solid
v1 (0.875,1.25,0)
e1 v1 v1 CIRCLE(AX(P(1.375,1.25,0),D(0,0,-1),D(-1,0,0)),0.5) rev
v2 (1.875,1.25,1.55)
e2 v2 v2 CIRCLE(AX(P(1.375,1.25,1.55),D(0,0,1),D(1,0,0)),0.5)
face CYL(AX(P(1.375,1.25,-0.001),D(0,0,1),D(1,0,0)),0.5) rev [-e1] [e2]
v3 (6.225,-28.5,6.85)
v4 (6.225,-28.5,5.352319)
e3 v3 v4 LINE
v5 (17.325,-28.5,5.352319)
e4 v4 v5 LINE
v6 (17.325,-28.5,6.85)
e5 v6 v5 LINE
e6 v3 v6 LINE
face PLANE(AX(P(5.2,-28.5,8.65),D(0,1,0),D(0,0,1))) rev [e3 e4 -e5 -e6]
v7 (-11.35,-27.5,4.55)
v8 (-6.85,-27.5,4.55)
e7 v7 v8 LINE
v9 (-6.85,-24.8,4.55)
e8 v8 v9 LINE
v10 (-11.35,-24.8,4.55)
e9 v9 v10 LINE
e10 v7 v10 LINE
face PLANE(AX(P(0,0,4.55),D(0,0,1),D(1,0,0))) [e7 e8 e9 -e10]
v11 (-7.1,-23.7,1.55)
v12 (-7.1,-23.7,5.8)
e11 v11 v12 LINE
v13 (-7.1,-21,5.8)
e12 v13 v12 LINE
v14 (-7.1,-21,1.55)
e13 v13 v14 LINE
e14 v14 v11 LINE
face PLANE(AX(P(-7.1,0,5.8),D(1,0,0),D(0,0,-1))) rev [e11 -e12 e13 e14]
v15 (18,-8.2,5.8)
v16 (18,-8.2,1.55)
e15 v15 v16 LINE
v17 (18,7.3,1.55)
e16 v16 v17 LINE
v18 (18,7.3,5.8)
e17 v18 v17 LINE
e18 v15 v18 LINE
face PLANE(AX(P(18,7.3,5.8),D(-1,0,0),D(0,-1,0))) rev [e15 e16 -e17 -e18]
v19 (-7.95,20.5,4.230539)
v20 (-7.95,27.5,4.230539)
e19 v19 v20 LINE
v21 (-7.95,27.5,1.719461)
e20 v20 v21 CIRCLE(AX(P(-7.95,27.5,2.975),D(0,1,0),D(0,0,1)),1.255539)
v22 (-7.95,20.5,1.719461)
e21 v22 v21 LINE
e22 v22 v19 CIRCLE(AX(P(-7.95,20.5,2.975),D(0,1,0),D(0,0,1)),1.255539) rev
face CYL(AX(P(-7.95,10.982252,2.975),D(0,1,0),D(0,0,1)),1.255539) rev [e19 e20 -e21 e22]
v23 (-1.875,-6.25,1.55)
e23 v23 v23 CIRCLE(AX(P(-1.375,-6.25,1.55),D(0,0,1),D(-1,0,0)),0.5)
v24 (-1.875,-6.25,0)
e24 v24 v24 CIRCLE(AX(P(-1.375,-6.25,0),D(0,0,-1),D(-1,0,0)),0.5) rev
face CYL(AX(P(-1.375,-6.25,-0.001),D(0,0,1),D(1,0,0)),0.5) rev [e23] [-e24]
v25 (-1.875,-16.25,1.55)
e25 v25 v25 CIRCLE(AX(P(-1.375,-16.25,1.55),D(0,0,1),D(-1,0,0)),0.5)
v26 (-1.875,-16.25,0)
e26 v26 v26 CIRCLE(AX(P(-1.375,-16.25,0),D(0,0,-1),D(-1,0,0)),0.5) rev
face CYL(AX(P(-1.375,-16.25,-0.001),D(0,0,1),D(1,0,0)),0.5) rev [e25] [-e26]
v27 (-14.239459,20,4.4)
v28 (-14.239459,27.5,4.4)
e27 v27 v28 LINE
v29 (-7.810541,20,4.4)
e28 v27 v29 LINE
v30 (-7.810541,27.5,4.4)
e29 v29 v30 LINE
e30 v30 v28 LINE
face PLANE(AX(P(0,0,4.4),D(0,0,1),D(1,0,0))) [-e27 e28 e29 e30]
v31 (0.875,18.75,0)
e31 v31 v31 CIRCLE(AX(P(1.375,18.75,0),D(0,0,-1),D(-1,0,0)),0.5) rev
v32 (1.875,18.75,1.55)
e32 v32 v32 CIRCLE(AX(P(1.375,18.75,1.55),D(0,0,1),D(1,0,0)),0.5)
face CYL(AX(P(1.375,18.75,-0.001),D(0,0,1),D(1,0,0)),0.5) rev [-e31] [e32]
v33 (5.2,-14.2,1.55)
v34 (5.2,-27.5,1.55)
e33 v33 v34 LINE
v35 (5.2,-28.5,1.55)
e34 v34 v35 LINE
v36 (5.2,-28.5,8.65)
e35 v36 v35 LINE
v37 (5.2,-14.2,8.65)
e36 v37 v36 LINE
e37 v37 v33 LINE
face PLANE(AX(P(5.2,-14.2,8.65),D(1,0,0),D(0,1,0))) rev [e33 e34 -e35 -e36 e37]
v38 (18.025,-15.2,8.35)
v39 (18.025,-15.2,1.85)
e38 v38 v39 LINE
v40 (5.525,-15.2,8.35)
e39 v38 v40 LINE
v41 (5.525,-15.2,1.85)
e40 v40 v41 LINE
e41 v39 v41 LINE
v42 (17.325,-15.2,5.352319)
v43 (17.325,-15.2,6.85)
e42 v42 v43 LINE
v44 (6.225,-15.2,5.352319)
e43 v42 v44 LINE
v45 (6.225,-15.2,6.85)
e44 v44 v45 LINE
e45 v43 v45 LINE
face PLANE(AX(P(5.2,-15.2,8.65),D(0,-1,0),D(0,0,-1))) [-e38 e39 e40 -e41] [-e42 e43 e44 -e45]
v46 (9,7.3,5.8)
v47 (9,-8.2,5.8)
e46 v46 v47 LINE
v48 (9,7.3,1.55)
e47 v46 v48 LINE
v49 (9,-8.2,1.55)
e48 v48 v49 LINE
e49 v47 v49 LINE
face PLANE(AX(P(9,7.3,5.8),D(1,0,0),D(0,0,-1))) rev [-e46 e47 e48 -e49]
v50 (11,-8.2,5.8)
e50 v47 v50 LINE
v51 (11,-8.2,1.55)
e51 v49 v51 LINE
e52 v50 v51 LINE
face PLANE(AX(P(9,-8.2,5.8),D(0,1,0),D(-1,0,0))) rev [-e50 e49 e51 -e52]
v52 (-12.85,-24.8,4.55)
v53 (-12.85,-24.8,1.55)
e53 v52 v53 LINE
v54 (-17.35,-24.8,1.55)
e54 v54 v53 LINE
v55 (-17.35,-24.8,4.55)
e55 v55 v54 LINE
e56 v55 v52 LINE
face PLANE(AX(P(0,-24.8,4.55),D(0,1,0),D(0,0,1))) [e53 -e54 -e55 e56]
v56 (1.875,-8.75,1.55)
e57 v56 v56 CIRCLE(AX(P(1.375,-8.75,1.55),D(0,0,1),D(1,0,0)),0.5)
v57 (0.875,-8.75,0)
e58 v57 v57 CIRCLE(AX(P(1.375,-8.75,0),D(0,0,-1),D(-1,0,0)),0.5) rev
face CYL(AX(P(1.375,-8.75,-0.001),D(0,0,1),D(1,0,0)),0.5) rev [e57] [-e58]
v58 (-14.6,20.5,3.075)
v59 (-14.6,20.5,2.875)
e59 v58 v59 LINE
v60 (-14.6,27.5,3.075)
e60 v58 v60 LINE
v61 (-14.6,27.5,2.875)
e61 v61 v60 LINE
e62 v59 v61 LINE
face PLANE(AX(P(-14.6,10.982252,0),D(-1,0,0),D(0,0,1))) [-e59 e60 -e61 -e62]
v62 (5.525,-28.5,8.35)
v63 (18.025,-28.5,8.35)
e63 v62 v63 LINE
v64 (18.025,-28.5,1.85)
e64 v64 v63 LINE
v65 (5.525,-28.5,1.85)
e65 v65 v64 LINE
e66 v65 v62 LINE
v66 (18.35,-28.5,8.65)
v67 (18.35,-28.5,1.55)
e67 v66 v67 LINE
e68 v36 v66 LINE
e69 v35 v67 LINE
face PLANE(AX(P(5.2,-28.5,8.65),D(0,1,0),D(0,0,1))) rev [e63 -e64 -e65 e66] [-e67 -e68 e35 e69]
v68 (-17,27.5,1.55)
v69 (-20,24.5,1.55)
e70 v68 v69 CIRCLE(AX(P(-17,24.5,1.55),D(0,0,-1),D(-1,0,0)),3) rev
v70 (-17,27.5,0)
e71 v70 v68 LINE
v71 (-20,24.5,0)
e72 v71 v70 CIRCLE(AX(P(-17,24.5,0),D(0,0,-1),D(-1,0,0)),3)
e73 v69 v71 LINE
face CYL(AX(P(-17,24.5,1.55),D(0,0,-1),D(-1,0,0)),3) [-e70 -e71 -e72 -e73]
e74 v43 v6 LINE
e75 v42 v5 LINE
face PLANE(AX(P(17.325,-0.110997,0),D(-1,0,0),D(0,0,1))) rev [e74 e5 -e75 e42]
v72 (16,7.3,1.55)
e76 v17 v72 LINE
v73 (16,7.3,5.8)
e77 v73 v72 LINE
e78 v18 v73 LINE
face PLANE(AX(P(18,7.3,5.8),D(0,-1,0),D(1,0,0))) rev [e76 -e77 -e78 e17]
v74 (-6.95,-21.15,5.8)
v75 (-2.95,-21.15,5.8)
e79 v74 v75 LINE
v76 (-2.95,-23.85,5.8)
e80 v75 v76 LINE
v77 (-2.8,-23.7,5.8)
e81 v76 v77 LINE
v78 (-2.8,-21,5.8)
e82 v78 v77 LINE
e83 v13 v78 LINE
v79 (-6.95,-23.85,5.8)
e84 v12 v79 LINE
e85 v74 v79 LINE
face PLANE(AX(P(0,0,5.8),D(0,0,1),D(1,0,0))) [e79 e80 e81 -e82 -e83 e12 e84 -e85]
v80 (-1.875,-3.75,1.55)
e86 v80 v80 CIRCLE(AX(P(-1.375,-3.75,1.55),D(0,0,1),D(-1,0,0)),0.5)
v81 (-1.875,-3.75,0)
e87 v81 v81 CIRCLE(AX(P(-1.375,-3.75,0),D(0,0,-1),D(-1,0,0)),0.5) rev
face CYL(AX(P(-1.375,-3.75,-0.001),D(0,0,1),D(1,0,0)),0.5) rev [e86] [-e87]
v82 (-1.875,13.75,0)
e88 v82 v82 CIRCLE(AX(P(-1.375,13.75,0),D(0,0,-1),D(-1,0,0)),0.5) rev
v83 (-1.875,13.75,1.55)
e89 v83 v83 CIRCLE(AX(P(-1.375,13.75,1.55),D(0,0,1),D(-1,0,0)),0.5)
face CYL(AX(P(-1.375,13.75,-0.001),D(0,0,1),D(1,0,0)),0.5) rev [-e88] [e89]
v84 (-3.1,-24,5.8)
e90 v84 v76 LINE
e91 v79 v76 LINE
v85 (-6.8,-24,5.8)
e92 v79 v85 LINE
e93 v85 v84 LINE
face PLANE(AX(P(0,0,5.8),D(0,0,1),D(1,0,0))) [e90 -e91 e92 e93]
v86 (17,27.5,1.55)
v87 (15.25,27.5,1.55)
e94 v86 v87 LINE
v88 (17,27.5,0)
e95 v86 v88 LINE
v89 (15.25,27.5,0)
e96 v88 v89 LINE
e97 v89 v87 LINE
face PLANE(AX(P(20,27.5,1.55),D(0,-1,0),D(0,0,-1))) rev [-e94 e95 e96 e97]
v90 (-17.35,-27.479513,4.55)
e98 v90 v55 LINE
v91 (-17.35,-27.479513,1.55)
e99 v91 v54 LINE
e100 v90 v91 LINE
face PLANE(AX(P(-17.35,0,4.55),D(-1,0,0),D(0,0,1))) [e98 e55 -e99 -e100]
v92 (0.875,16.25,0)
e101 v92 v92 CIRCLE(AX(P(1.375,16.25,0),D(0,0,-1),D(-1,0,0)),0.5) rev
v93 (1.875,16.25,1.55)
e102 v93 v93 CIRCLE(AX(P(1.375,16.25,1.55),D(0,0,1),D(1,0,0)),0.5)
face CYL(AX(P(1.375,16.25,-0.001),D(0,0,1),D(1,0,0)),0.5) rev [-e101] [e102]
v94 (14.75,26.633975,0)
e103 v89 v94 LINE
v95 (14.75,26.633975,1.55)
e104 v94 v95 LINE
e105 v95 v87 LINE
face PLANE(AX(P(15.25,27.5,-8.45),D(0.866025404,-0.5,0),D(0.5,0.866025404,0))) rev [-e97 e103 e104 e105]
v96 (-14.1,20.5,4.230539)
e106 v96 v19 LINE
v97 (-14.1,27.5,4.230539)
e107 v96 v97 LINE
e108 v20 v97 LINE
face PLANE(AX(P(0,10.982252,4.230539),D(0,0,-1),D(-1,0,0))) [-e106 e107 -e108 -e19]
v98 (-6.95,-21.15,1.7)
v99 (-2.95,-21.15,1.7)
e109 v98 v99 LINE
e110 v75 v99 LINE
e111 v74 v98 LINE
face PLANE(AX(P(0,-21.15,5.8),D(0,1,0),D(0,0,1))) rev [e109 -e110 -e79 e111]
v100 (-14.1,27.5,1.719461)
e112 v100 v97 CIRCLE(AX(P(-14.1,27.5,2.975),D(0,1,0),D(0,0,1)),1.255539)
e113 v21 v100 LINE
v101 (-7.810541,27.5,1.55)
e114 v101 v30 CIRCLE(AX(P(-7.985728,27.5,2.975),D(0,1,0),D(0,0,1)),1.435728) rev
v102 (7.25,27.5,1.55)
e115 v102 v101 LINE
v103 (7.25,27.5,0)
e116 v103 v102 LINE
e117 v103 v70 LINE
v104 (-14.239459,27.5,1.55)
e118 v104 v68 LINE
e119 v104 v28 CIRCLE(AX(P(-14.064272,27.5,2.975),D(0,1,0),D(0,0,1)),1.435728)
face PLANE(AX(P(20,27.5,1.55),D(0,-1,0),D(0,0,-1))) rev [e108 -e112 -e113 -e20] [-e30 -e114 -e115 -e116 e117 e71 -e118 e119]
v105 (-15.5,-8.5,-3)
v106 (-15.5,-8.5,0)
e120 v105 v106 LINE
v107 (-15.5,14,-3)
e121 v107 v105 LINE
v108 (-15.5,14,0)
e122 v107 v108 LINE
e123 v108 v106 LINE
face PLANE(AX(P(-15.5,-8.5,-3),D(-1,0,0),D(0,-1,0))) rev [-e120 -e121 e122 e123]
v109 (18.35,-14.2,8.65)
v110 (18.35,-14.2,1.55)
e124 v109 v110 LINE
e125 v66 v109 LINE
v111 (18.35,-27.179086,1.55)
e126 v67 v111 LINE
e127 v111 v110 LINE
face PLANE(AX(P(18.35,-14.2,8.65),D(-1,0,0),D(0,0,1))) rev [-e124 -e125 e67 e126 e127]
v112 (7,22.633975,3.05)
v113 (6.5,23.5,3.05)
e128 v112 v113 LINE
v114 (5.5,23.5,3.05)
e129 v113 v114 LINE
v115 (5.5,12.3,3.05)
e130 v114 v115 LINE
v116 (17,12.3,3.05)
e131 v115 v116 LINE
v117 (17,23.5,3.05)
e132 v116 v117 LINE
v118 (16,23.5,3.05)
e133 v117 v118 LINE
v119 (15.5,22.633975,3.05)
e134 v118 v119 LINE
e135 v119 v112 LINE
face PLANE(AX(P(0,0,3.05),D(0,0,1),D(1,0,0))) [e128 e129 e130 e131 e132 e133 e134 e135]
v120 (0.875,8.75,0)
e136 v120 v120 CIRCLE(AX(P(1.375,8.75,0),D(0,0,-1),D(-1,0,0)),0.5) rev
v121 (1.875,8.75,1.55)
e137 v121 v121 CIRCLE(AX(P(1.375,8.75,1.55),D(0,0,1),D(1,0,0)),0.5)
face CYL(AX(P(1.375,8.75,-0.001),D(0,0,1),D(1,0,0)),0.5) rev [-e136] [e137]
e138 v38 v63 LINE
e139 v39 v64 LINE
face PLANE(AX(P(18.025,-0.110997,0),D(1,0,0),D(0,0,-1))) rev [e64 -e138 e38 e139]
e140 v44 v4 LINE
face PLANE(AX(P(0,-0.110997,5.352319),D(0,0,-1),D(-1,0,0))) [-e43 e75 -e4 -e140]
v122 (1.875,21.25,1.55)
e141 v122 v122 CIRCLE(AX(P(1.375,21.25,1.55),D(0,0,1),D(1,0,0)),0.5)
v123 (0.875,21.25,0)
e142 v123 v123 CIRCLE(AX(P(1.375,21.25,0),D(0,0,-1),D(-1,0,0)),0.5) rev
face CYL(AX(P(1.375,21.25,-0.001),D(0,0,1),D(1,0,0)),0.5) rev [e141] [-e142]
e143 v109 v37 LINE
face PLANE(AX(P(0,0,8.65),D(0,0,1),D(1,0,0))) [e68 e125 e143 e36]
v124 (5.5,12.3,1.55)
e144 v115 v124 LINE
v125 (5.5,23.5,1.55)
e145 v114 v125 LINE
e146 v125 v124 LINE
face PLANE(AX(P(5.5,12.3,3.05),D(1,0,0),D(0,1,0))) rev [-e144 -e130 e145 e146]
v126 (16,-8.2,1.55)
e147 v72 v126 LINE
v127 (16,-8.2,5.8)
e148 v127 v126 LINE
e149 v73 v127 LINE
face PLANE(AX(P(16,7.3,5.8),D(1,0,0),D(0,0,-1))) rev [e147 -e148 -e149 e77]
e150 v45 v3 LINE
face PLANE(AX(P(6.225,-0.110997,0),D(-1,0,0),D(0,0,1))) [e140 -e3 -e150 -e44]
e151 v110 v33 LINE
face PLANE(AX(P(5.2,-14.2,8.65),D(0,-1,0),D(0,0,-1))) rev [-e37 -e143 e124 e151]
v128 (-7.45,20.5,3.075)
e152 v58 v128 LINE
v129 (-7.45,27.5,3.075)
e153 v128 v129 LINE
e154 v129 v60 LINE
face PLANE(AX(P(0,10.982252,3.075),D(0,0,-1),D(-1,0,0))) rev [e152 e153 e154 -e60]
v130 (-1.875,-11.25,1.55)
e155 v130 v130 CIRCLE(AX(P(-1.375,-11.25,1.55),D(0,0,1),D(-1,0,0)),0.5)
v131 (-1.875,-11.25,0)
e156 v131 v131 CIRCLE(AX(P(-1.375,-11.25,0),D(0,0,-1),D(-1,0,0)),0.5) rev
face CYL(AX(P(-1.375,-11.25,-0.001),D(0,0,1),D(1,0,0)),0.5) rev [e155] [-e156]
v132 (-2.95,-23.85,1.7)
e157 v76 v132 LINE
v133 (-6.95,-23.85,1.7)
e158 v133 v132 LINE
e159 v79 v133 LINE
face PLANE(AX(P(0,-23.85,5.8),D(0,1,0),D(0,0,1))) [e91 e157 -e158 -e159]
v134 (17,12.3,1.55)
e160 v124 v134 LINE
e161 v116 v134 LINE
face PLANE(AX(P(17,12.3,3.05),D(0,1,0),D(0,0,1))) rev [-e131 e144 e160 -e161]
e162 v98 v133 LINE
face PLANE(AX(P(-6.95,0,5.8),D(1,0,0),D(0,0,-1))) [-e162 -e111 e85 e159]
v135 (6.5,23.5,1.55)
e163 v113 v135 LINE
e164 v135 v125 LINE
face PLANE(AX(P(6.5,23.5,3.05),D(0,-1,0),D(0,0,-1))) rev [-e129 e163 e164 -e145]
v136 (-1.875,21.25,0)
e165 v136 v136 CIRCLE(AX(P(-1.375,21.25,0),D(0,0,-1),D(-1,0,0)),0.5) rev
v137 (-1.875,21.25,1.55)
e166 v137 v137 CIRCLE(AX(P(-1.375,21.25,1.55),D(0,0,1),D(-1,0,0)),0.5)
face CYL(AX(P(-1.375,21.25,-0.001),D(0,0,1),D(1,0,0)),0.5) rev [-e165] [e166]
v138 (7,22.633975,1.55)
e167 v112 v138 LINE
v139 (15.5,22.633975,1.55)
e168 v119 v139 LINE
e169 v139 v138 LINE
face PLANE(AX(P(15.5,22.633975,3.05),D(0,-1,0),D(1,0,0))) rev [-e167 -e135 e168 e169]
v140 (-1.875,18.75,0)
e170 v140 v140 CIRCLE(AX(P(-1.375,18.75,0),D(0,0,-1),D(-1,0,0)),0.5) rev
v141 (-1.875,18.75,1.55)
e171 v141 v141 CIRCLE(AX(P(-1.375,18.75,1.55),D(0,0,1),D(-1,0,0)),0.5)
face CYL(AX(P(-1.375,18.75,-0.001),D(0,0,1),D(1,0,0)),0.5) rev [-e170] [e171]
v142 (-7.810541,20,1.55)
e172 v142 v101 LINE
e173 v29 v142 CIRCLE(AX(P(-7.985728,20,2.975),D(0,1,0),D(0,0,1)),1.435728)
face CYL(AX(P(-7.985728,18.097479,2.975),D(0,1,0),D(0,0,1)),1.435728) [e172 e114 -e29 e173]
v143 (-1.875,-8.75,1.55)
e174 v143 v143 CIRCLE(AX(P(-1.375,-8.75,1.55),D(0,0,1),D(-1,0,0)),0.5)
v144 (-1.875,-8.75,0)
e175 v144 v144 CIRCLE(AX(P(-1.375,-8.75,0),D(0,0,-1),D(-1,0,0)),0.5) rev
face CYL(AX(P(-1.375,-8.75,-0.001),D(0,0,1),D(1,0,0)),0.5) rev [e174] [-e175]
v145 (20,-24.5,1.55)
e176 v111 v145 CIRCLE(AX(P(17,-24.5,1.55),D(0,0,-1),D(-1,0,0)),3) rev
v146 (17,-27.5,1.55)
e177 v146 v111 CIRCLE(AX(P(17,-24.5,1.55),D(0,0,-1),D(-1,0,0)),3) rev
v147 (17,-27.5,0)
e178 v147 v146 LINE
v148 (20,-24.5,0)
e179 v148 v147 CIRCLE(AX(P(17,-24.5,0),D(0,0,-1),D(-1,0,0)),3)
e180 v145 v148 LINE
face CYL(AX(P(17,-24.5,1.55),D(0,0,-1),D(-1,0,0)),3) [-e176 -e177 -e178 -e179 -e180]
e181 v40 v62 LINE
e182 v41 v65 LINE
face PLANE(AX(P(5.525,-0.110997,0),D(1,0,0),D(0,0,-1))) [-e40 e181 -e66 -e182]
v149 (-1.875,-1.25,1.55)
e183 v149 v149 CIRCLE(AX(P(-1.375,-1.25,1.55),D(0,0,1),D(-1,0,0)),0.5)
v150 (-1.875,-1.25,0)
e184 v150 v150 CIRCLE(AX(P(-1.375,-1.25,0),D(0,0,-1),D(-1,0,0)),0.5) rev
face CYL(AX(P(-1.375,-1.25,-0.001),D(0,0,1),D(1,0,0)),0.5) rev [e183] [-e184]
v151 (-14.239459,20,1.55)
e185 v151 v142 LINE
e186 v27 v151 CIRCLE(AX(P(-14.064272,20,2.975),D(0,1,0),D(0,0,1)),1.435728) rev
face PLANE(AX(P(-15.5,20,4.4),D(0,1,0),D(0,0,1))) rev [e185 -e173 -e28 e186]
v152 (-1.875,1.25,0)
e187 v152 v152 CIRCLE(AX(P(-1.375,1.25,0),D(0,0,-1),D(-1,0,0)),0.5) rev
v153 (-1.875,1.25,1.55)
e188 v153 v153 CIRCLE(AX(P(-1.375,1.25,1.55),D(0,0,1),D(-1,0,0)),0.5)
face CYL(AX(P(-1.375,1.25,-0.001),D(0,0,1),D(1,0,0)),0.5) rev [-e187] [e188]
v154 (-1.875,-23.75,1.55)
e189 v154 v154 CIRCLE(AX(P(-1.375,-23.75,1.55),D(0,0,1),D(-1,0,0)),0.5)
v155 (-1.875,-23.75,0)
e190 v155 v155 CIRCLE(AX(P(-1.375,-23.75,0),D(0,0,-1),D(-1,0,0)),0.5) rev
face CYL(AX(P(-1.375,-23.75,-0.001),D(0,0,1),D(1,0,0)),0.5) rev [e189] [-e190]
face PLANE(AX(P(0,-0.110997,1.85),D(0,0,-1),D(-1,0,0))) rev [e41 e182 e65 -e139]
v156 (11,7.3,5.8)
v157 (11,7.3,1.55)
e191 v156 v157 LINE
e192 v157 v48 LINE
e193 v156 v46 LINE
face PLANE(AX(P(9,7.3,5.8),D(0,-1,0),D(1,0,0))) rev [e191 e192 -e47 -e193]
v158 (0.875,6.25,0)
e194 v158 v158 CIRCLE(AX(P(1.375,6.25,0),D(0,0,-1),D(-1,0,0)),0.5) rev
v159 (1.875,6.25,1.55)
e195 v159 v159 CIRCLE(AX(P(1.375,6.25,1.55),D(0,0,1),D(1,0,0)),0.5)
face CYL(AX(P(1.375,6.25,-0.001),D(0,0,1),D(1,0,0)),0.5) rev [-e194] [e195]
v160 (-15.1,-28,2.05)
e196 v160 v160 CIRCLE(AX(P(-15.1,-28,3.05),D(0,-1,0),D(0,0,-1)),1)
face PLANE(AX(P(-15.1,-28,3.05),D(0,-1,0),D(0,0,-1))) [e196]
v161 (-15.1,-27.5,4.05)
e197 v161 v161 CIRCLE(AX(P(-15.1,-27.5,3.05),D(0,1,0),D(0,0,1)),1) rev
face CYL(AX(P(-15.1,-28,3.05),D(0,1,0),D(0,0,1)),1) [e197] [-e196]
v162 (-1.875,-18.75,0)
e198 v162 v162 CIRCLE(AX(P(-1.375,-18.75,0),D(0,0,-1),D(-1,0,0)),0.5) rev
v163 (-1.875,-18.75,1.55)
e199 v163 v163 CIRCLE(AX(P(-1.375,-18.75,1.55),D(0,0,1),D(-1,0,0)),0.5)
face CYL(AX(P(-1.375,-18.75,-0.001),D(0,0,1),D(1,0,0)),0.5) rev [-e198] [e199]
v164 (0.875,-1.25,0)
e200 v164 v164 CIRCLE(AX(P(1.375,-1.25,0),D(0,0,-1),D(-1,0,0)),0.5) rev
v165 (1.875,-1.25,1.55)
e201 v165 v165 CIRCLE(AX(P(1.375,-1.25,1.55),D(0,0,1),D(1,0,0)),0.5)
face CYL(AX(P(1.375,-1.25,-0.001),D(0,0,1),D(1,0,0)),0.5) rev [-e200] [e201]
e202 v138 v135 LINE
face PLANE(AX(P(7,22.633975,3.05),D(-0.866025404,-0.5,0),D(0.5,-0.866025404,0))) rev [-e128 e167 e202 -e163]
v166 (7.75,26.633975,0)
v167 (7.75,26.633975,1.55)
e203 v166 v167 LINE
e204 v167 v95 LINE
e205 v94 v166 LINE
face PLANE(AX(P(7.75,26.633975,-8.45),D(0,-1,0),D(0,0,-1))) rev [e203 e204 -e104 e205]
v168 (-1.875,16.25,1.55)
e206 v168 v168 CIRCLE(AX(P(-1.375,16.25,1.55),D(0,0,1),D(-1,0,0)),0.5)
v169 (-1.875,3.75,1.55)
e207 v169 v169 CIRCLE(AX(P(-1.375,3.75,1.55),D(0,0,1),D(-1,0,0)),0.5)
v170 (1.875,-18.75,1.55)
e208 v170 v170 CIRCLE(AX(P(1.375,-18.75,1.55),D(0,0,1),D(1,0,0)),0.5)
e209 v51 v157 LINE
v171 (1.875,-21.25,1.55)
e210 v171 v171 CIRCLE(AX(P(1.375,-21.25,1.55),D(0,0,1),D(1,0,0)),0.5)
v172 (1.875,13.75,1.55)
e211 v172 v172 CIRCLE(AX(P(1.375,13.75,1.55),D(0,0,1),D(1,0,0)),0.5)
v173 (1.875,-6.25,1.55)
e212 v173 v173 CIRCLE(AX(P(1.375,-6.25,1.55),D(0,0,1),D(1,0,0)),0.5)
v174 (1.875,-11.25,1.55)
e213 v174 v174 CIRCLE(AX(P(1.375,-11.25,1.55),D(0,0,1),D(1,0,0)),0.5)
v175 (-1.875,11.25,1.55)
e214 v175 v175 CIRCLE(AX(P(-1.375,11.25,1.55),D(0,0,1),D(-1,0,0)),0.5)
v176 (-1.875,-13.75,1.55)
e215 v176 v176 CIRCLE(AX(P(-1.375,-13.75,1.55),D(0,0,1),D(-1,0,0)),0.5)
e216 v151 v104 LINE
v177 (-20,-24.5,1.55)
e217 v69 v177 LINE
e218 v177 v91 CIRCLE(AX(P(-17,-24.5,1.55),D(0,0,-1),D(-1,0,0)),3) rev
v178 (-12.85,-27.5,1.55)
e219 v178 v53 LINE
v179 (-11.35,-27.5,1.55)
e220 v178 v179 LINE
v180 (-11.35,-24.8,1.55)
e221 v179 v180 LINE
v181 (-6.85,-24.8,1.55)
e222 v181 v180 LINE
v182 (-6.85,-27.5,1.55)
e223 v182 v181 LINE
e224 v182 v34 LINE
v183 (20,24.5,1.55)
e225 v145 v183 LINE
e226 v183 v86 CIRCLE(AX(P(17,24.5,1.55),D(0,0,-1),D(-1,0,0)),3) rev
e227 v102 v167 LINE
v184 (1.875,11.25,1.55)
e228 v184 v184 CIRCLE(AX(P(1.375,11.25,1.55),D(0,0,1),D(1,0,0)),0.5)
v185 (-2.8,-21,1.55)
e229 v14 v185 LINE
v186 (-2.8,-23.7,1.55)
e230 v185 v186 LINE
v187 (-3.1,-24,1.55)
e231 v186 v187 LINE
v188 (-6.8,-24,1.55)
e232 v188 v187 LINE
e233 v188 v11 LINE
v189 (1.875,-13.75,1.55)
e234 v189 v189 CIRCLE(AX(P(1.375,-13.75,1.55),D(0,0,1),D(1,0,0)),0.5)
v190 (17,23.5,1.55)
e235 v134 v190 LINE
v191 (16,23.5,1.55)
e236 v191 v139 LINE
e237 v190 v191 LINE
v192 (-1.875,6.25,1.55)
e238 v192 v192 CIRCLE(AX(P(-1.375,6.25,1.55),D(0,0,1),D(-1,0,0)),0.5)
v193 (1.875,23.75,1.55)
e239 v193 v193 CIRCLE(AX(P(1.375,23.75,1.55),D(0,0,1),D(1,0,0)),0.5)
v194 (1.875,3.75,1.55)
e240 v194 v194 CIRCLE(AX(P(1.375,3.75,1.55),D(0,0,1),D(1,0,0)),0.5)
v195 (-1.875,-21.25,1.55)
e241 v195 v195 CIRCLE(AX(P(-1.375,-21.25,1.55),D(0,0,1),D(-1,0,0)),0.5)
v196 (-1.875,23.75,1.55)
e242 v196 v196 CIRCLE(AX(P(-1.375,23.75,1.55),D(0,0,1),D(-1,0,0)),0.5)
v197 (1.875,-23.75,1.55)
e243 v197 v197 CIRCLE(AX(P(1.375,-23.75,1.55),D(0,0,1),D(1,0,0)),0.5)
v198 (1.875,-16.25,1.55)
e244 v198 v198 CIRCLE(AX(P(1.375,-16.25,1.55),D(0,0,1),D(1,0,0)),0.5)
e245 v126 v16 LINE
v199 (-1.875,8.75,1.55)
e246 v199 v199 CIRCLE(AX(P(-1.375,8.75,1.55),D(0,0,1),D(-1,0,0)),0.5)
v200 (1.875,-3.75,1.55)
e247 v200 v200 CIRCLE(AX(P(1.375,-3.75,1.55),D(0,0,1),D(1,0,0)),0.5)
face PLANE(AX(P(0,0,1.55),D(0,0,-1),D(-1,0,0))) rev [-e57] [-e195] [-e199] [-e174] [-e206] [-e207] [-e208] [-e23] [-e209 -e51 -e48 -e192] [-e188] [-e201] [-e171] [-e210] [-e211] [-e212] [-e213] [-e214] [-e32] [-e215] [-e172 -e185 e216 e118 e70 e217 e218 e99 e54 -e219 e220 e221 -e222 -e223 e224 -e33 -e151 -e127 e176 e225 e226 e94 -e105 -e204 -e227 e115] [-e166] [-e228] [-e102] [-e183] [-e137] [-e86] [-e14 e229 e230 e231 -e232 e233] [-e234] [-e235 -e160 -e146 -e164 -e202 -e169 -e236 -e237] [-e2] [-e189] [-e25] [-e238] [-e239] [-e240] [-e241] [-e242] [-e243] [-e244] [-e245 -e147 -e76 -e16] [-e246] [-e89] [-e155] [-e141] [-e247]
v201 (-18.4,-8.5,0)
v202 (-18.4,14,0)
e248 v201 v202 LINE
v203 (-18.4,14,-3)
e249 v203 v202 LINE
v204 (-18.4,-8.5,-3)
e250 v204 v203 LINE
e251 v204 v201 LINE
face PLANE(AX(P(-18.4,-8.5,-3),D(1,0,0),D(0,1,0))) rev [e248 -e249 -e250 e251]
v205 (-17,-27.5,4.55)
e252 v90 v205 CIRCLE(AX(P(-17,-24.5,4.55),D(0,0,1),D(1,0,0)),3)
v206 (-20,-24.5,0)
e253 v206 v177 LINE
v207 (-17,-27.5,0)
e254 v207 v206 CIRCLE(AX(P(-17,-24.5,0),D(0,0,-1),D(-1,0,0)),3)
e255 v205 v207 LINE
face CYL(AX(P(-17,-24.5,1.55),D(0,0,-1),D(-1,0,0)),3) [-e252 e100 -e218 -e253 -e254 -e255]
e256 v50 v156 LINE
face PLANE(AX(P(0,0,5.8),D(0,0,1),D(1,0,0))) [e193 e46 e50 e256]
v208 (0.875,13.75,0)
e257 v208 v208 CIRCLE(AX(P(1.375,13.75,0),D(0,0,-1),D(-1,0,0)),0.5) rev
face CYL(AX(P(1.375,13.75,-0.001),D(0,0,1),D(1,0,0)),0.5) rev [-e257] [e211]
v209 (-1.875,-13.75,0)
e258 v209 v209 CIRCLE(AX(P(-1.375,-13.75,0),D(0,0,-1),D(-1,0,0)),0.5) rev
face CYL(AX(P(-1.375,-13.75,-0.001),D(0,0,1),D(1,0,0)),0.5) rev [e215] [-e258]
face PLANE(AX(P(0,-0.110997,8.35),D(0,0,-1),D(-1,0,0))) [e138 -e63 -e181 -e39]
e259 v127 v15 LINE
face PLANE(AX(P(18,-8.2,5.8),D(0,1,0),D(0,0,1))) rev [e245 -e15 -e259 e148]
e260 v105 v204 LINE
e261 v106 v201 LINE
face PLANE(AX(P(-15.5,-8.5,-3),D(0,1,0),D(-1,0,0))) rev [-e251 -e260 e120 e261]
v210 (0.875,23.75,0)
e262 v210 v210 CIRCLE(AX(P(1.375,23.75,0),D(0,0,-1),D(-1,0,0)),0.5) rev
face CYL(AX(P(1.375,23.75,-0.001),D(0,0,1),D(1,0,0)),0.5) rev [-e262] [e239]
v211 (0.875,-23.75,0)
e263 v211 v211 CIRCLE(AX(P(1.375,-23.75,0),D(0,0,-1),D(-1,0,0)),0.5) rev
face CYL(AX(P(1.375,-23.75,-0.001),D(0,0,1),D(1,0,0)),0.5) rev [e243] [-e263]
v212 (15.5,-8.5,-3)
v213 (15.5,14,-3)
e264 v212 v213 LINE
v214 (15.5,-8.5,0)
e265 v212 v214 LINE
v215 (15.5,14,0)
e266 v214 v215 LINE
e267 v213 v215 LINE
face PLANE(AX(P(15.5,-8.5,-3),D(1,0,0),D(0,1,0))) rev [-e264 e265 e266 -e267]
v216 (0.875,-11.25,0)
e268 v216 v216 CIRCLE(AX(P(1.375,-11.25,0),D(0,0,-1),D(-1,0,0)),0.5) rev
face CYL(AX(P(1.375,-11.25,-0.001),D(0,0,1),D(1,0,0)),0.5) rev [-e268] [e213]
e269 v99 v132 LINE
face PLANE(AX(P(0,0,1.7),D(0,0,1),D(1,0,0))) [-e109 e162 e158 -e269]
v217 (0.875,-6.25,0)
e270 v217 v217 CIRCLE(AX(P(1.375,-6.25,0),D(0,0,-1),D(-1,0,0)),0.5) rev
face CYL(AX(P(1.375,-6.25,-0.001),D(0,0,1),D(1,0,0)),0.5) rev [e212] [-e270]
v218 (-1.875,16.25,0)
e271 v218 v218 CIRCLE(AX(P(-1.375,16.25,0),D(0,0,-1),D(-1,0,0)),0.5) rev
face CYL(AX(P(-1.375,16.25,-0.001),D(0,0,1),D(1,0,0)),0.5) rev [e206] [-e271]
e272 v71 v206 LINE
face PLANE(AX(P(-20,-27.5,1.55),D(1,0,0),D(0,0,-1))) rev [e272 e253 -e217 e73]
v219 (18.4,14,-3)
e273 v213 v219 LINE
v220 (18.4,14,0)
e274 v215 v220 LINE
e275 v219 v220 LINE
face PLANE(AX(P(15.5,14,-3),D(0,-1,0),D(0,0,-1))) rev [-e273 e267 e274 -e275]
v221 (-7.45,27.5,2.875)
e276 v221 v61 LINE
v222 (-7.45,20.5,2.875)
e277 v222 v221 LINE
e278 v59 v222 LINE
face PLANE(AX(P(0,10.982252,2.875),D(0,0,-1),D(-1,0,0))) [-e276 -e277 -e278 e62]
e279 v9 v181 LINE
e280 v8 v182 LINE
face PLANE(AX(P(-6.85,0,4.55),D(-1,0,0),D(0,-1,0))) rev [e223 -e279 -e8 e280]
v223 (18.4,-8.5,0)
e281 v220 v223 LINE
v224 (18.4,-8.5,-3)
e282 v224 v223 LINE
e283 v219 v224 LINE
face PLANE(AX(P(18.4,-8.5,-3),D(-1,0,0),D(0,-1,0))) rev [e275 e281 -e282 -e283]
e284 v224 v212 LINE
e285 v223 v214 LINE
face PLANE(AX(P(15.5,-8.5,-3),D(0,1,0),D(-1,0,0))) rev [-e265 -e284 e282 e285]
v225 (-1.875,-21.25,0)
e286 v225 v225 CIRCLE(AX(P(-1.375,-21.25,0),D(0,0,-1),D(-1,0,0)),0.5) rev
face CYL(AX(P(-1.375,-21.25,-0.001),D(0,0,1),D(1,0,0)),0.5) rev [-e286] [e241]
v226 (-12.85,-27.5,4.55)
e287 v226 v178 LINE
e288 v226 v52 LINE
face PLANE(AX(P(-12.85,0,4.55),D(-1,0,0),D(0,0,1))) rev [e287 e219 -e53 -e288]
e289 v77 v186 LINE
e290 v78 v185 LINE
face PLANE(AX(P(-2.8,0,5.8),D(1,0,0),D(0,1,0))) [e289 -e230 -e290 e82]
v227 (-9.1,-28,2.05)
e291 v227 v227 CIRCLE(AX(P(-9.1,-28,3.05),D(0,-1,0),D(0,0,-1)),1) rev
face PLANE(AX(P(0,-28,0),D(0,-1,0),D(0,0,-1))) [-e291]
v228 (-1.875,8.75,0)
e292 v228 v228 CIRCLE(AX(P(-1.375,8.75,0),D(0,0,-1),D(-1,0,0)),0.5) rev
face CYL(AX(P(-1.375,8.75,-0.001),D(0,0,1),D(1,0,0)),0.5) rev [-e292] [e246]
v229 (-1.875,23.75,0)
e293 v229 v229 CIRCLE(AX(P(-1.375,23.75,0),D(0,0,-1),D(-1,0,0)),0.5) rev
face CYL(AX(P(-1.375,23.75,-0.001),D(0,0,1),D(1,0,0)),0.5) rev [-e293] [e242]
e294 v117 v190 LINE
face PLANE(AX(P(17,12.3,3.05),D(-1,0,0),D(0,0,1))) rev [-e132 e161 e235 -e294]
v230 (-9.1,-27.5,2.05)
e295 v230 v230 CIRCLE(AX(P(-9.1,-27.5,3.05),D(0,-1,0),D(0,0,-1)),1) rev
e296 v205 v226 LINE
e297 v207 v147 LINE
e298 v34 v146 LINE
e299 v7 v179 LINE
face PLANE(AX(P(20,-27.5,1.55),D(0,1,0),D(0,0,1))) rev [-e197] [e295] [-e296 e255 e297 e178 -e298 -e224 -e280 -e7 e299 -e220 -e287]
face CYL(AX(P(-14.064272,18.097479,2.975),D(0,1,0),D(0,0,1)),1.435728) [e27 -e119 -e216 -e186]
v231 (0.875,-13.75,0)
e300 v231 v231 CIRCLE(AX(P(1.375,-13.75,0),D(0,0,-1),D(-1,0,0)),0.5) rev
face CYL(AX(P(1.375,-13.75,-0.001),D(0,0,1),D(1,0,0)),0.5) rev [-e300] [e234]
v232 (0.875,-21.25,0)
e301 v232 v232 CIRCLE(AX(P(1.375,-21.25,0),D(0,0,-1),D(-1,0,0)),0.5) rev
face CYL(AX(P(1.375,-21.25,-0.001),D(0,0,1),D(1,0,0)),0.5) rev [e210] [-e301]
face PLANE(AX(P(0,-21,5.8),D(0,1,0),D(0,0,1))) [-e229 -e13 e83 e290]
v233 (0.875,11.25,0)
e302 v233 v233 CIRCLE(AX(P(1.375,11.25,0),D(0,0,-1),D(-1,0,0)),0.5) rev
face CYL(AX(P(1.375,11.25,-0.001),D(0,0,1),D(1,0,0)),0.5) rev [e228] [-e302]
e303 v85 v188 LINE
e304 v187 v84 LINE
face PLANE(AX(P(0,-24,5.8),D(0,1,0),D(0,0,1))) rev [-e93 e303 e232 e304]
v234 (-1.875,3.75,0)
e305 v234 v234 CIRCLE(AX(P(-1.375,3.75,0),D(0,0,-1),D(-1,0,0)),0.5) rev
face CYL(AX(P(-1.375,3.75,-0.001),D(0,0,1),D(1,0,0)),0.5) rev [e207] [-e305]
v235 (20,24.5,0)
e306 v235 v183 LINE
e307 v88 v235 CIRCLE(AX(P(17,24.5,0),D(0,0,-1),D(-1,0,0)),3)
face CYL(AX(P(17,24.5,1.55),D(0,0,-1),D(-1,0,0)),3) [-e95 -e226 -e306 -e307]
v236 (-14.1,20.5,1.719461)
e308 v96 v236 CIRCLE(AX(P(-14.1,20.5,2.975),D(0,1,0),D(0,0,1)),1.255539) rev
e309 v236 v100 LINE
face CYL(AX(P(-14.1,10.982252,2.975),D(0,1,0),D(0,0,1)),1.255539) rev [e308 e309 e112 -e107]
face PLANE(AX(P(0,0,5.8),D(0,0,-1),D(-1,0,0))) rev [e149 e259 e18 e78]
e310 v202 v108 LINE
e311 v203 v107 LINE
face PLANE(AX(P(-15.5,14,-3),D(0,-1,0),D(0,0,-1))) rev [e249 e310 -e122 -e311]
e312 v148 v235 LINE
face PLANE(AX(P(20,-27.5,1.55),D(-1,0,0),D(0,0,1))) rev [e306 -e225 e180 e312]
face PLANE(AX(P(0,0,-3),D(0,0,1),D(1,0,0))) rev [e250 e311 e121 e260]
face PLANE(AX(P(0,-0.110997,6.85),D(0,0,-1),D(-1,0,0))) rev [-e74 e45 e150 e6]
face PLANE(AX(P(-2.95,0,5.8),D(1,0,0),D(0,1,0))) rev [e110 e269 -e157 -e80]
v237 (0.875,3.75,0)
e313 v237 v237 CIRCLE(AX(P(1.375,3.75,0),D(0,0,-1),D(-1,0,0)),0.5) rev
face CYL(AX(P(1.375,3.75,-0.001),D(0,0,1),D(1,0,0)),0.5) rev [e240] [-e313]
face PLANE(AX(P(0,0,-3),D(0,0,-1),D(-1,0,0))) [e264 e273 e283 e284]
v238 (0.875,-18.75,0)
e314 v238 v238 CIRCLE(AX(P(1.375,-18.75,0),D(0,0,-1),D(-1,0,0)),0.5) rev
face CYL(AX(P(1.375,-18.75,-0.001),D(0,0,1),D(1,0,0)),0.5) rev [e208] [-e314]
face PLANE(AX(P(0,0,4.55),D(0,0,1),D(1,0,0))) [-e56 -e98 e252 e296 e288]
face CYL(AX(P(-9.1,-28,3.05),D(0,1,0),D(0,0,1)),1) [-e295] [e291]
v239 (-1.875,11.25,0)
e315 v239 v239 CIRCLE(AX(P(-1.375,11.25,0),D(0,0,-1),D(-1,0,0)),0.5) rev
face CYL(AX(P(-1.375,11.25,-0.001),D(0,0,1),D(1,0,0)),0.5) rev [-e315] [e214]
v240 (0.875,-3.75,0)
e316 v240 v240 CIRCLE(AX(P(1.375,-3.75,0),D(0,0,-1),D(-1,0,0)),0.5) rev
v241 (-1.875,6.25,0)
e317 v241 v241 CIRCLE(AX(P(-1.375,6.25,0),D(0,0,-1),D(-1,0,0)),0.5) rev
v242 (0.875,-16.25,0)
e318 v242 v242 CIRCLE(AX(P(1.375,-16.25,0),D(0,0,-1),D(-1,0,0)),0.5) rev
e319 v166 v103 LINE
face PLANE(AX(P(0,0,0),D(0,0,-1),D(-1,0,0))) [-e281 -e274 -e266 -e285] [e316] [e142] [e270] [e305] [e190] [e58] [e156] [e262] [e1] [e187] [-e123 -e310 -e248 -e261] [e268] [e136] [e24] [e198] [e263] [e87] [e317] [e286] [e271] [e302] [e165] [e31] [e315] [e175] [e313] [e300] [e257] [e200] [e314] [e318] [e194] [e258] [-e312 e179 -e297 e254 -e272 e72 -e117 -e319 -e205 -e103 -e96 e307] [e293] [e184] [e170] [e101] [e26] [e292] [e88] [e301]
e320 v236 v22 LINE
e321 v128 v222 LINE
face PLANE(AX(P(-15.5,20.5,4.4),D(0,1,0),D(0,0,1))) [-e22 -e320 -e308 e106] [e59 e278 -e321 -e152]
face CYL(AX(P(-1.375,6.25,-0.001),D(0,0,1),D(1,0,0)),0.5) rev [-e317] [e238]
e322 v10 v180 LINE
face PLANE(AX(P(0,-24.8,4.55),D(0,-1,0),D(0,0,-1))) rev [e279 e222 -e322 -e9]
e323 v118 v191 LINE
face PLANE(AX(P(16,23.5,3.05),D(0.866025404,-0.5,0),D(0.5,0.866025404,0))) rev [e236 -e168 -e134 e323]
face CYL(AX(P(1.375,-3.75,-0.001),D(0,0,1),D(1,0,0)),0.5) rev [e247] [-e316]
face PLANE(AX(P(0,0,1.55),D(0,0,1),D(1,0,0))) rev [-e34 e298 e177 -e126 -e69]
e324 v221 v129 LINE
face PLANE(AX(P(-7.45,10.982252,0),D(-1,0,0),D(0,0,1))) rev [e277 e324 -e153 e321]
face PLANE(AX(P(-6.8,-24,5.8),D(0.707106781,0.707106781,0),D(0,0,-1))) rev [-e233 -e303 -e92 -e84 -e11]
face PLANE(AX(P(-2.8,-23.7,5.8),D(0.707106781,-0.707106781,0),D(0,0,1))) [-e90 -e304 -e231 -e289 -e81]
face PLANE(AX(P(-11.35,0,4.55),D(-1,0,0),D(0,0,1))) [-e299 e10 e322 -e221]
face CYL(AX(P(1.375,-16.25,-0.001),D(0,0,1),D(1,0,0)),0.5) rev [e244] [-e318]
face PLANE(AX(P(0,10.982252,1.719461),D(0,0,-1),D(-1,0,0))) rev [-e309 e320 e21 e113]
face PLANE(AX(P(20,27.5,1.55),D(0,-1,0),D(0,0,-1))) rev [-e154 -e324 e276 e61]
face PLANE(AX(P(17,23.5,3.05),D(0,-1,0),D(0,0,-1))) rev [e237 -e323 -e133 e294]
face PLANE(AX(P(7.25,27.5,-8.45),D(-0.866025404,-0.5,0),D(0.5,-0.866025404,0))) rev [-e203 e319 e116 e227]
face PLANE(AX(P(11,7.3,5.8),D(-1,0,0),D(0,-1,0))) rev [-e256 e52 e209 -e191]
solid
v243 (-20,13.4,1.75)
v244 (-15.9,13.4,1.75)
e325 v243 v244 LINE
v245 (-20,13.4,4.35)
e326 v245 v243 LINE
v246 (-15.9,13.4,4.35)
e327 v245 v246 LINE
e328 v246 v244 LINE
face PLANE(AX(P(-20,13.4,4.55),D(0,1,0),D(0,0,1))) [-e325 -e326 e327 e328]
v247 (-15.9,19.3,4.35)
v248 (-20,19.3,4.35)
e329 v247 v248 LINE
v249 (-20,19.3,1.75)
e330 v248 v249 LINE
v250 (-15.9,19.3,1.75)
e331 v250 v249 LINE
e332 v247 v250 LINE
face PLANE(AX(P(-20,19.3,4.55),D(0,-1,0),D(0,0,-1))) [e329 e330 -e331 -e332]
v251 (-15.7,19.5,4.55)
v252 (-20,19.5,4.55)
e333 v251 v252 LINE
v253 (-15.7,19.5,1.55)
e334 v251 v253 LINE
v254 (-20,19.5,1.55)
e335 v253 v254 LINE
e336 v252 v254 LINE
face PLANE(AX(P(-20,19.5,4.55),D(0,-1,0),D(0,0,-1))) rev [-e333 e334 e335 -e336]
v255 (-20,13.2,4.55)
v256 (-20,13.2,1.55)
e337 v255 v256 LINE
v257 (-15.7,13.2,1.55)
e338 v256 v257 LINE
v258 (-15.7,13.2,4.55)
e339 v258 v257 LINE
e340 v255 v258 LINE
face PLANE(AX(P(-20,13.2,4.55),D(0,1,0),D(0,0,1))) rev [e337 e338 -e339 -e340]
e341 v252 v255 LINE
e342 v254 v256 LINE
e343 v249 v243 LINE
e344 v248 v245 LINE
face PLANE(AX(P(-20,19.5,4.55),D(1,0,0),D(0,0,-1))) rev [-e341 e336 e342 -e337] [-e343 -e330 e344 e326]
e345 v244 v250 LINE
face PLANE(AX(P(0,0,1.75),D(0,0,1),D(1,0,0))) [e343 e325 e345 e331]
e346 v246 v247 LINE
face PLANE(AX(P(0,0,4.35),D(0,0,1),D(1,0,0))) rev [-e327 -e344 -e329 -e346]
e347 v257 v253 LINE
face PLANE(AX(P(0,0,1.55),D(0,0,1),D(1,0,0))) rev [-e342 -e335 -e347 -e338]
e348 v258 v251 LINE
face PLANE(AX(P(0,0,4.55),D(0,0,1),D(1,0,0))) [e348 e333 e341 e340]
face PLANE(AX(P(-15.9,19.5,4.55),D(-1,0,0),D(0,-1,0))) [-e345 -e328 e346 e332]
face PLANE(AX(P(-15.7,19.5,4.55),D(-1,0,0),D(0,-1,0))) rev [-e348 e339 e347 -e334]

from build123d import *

# Parameters (mm, degrees)
SKETCH1_W            = 55
SKETCH1_H            = 40
BOSS_EXTRUDE1_DEPTH  = 1.55
FILLET1_R            = 3
SKETCH2_W            = 13.15
SKETCH2_H            = 14.3
BOSS_EXTRUDE2_DEPTH  = 7.1
SKETCH3_W            = 12.5
SKETCH3_H            = 6.5
SKETCH3_W_2          = 11.1
SKETCH3_H_2          = 1.497681088
CUT_EXTRUDE1_DEPTH   = 13.3
SKETCH4_W            = 8.95
SKETCH4_H            = 7.5
BOSS_EXTRUDE3_DEPTH  = 2.85
CUT_EXTRUDE2_DEPTH   = 7.5
SKETCH5_3_W          = 7.15
SKETCH5_3_H          = 0.2
CUT_EXTRUDE3_DEPTH   = 7
BOSS_EXTRUDE4_DEPTH  = 1.5
CUT_EXTRUDE4_DEPTH   = 10
BOSS_EXTRUDE5_START  = 3
SKETCH8_W            = 4.5
SKETCH8_H            = 2.7
BOSS_EXTRUDE5_DEPTH  = 3
SKETCH9_R            = 1
BOSS_EXTRUDE6_DEPTH  = 0.5
SKETCH10_W           = 2
SKETCH10_H           = 15.5
BOSS_EXTRUDE7_DEPTH  = 4.25
SKETCH8_4_W          = 4.3
SKETCH8_4_H          = 3
BOSS_EXTRUDE9_DEPTH  = 4.25
SHELL2_T             = -0.15
CHAMFER1_SIZE        = 0.3
SKETCH11_R           = 0.5
CUT_EXTRUDE5_DEPTH   = 1.55
SKETCH12_W           = 4.3
SKETCH12_H           = 6.3
BOSS_EXTRUDE10_DEPTH = 3
SHELL3_T             = -0.2
SKETCH13_W           = 2.9
SKETCH13_H           = 22.5
BOSS_EXTRUDE11_DEPTH = 3


with BuildPart() as part:
    # Sketch1 → Boss-Extrude1 (new body)
    with BuildSketch(Plane(origin=(0, 0, 0), x_dir=(0, 1, 0), z_dir=(0, 0, 1))):
        Rectangle(SKETCH1_W, SKETCH1_H)
    extrude(amount=BOSS_EXTRUDE1_DEPTH)

    # Fillet1
    fillet1_edges = [part.edges().sort_by_distance(p)[0] for p in [
        (20, 27.5, 0.775),
        (20, -27.5, 0.775),
        (-20, -27.5, 0.775),
        (-20, 27.5, 0.775),
    ]]
    fillet(fillet1_edges, radius=FILLET1_R)

    # Sketch2 → Boss-Extrude2 (add)
    with BuildSketch(Plane.XY.offset(1.55)):
        with Locations((11.775, -21.35)):
            Rectangle(SKETCH2_W, SKETCH2_H)
    extrude(amount=BOSS_EXTRUDE2_DEPTH)

    # Sketch3 → Cut-Extrude1 (cut)
    with BuildSketch(Plane.XZ.offset(28.5)):
        with Locations((11.775, 5.1)):
            Rectangle(SKETCH3_W, SKETCH3_H)
        with Locations((11.775, 6.101159456)):
            Rectangle(SKETCH3_W_2, SKETCH3_H_2, mode=Mode.SUBTRACT)
    extrude(amount=-CUT_EXTRUDE1_DEPTH, mode=Mode.SUBTRACT)

    # Sketch4 → Boss-Extrude3 (add)
    with BuildSketch(Plane.XY.offset(1.55)):
        with Locations((-11.025, 23.75)):
            Rectangle(SKETCH4_W, SKETCH4_H)
    extrude(amount=BOSS_EXTRUDE3_DEPTH)

    # Sketch5 → Cut-Extrude2 (cut)
    with BuildSketch(Plane(origin=(0, 27.5, 0), x_dir=(-1, 0, 0), z_dir=(0, 1, 0))):
        with BuildLine():
            Line((6.55, 4.4), (6.55, 2.975))
            ThreePointArc((6.55, 2.975), (6.910359128, 3.926260685), (7.810540583, 4.4))
            Line((7.810540583, 4.4), (6.55, 4.4))
        make_face()
        with BuildLine():
            Line((6.55, 1.55), (7.810540583, 1.55))
            ThreePointArc((7.810540583, 1.55), (6.910359128, 2.023739315), (6.55, 2.975))
            Line((6.55, 2.975), (6.55, 1.55))
        make_face()
        with BuildLine():
            Line((15.5, 1.55), (15.5, 2.975))
            ThreePointArc((15.5, 2.975), (15.139640872, 2.023739315), (14.239459417, 1.55))
            Line((14.239459417, 1.55), (15.5, 1.55))
        make_face()
        with BuildLine():
            Line((15.5, 4.4), (14.239459417, 4.4))
            ThreePointArc((14.239459417, 4.4), (15.139640872, 3.926260685), (15.5, 2.975))
            Line((15.5, 2.975), (15.5, 4.4))
        make_face()
    extrude(amount=-CUT_EXTRUDE2_DEPTH, mode=Mode.SUBTRACT)

    # Sketch5<3> → Cut-Extrude3 (cut)
    with BuildSketch(Plane(origin=(0, 27.5, 0), x_dir=(-1, 0, 0), z_dir=(0, 1, 0))):
        with BuildLine():
            Line((7.95, 1.719461162), (14.1, 1.719461162))
            ThreePointArc((14.1, 1.719461162), (15.355538838, 2.975), (14.1, 4.230538838))
            Line((14.1, 4.230538838), (7.95, 4.230538838))
            ThreePointArc((7.95, 4.230538838), (6.694461162, 2.975), (7.95, 1.719461162))
        make_face()
        with Locations((11.025, 2.975)):
            Rectangle(SKETCH5_3_W, SKETCH5_3_H, mode=Mode.SUBTRACT)
    extrude(amount=-CUT_EXTRUDE3_DEPTH, mode=Mode.SUBTRACT)

    # Sketch6 → Boss-Extrude4 (add)
    with BuildSketch(Plane.XY.offset(1.55)):
        Polygon((16, 23.5), (15.5, 22.633974596), (7, 22.633974596), (6.5, 23.5), (5.5, 23.5), (5.5, 12.3), (17, 12.3), (17, 23.5), align=None)
    extrude(amount=BOSS_EXTRUDE4_DEPTH)

    # Sketch7 → Cut-Extrude4 (cut)
    with BuildSketch(Plane.XY.offset(1.55)):
        Polygon((7.25, 27.5), (7.75, 26.633974596), (14.75, 26.633974596), (15.25, 27.5), align=None)
    extrude(amount=-CUT_EXTRUDE4_DEPTH, mode=Mode.SUBTRACT)

    # Sketch8 → Boss-Extrude5 (add)
    with BuildSketch(Plane.XY.offset(1.55).offset(BOSS_EXTRUDE5_START)):
        with BuildLine():
            ThreePointArc((-17.35, -27.479513383), (-17.17529953, -27.494873966), (-17, -27.5))
            Line((-17, -27.5), (-12.85, -27.5))
            Line((-12.85, -27.5), (-12.85, -24.8))
            Line((-12.85, -24.8), (-17.35, -24.8))
            Line((-17.35, -24.8), (-17.35, -27.479513383))
        make_face()
        with Locations((-9.1, -26.15)):
            Rectangle(SKETCH8_W, SKETCH8_H)
    extrude(amount=-BOSS_EXTRUDE5_DEPTH)

    # Sketch9 → Boss-Extrude6 (add)
    with BuildSketch(Plane.XZ.offset(27.5)):
        with Locations(Location((-9.1, 3.05, 0), (0, 0, 270))):
            Circle(SKETCH9_R)
        with Locations(Location((-15.1, 3.05, 0), (0, 0, 90))):
            Circle(SKETCH9_R)
    extrude(amount=BOSS_EXTRUDE6_DEPTH)

    # Sketch10 → Boss-Extrude7 (add)
    with BuildSketch(Plane.XY.offset(1.55)):
        with Locations((17, -0.45)):
            Rectangle(SKETCH10_W, SKETCH10_H)
        with Locations((10, -0.45)):
            Rectangle(SKETCH10_W, SKETCH10_H)
    extrude(amount=BOSS_EXTRUDE7_DEPTH)


with BuildPart() as body_2:
    # Sketch8<4> → Boss-Extrude9 (new body)
    with BuildSketch(Plane.XY.offset(1.55)):
        with Locations((-4.95, -22.5)):
            Rectangle(SKETCH8_4_W, SKETCH8_4_H)
    extrude(amount=BOSS_EXTRUDE9_DEPTH)

    # Shell2
    shell2_openings = [body_2.faces().sort_by_distance(p)[0] for p in [
        (-4.95, -22.5, 5.8),
    ]]
    offset(amount=SHELL2_T, openings=shell2_openings, kind=Kind.INTERSECTION)


with BuildPart() as part_1:
    add(part.part)

    # Combine1: union body 2
    add(body_2.part)

    # Chamfer1
    chamfer1_edges = [part_1.edges().sort_by_distance(p)[0] for p in [
        (-2.8, -24, 3.675),
        (-7.1, -24, 3.675),
    ]]
    chamfer(chamfer1_edges, length=CHAMFER1_SIZE - 0.0001)  # a hair under: the kernel refuses the full size

    # Sketch11 → Cut-Extrude5 (cut)
    with BuildSketch(Plane.XY.offset(1.55)):
        with Locations((1.375, 23.75)):
            Circle(SKETCH11_R)
        with Locations((1.375, 21.25)):
            Circle(SKETCH11_R)
        with Locations((1.375, 18.75)):
            Circle(SKETCH11_R)
        with Locations((1.375, 16.25)):
            Circle(SKETCH11_R)
        with Locations((1.375, 13.75)):
            Circle(SKETCH11_R)
        with Locations((1.375, 11.25)):
            Circle(SKETCH11_R)
        with Locations((1.375, 8.75)):
            Circle(SKETCH11_R)
        with Locations((1.375, 6.25)):
            Circle(SKETCH11_R)
        with Locations((1.375, 3.75)):
            Circle(SKETCH11_R)
        with Locations((1.375, 1.25)):
            Circle(SKETCH11_R)
        with Locations((1.375, -1.25)):
            Circle(SKETCH11_R)
        with Locations((1.375, -3.75)):
            Circle(SKETCH11_R)
        with Locations((1.375, -6.25)):
            Circle(SKETCH11_R)
        with Locations((1.375, -8.75)):
            Circle(SKETCH11_R)
        with Locations((1.375, -11.25)):
            Circle(SKETCH11_R)
        with Locations((1.375, -13.75)):
            Circle(SKETCH11_R)
        with Locations((1.375, -16.25)):
            Circle(SKETCH11_R)
        with Locations((1.375, -18.75)):
            Circle(SKETCH11_R)
        with Locations((1.375, -21.25)):
            Circle(SKETCH11_R)
        with Locations((1.375, -23.75)):
            Circle(SKETCH11_R)
        with Locations(Location((-1.375, -23.75, 0), (0, 0, 180))):
            Circle(SKETCH11_R)
        with Locations(Location((-1.375, -21.25, 0), (0, 0, 180))):
            Circle(SKETCH11_R)
        with Locations(Location((-1.375, -18.75, 0), (0, 0, 180))):
            Circle(SKETCH11_R)
        with Locations(Location((-1.375, -16.25, 0), (0, 0, 180))):
            Circle(SKETCH11_R)
        with Locations(Location((-1.375, -13.75, 0), (0, 0, 180))):
            Circle(SKETCH11_R)
        with Locations(Location((-1.375, -11.25, 0), (0, 0, 180))):
            Circle(SKETCH11_R)
        with Locations(Location((-1.375, -8.75, 0), (0, 0, 180))):
            Circle(SKETCH11_R)
        with Locations(Location((-1.375, -6.25, 0), (0, 0, 180))):
            Circle(SKETCH11_R)
        with Locations(Location((-1.375, -3.75, 0), (0, 0, 180))):
            Circle(SKETCH11_R)
        with Locations(Location((-1.375, -1.25, 0), (0, 0, 180))):
            Circle(SKETCH11_R)
        with Locations(Location((-1.375, 1.25, 0), (0, 0, 180))):
            Circle(SKETCH11_R)
        with Locations(Location((-1.375, 3.75, 0), (0, 0, 180))):
            Circle(SKETCH11_R)
        with Locations(Location((-1.375, 6.25, 0), (0, 0, 180))):
            Circle(SKETCH11_R)
        with Locations(Location((-1.375, 8.75, 0), (0, 0, 180))):
            Circle(SKETCH11_R)
        with Locations(Location((-1.375, 11.25, 0), (0, 0, 180))):
            Circle(SKETCH11_R)
        with Locations(Location((-1.375, 13.75, 0), (0, 0, 180))):
            Circle(SKETCH11_R)
        with Locations(Location((-1.375, 16.25, 0), (0, 0, 180))):
            Circle(SKETCH11_R)
        with Locations(Location((-1.375, 18.75, 0), (0, 0, 180))):
            Circle(SKETCH11_R)
        with Locations(Location((-1.375, 23.75, 0), (0, 0, 180))):
            Circle(SKETCH11_R)
        with Locations(Location((-1.375, 21.25, 0), (0, 0, 180))):
            Circle(SKETCH11_R)
    extrude(amount=-CUT_EXTRUDE5_DEPTH, mode=Mode.SUBTRACT)

    # Sketch13 → Boss-Extrude11 (add)
    with BuildSketch(Plane(origin=(0, 0, 0), x_dir=(1, 0, 0), z_dir=(0, 0, -1))):
        with Locations((16.95, -2.75)):
            Rectangle(SKETCH13_W, SKETCH13_H)
        with Locations((-16.95, -2.75)):
            Rectangle(SKETCH13_W, SKETCH13_H)
    extrude(amount=BOSS_EXTRUDE11_DEPTH)


with BuildPart() as body_2_2:
    # Sketch12 → Boss-Extrude10 (new body)
    with BuildSketch(Plane.XY.offset(1.55)):
        with Locations((-17.85, 16.35)):
            Rectangle(SKETCH12_W, SKETCH12_H)
    extrude(amount=BOSS_EXTRUDE10_DEPTH)

    # Shell3
    shell3_openings = [body_2_2.faces().sort_by_distance(p)[0] for p in [
        (-20, 16.35, 3.05),
    ]]
    offset(amount=SHELL3_T, openings=shell3_openings, kind=Kind.INTERSECTION)


solid = Compound([part_1.part, body_2_2.part])
